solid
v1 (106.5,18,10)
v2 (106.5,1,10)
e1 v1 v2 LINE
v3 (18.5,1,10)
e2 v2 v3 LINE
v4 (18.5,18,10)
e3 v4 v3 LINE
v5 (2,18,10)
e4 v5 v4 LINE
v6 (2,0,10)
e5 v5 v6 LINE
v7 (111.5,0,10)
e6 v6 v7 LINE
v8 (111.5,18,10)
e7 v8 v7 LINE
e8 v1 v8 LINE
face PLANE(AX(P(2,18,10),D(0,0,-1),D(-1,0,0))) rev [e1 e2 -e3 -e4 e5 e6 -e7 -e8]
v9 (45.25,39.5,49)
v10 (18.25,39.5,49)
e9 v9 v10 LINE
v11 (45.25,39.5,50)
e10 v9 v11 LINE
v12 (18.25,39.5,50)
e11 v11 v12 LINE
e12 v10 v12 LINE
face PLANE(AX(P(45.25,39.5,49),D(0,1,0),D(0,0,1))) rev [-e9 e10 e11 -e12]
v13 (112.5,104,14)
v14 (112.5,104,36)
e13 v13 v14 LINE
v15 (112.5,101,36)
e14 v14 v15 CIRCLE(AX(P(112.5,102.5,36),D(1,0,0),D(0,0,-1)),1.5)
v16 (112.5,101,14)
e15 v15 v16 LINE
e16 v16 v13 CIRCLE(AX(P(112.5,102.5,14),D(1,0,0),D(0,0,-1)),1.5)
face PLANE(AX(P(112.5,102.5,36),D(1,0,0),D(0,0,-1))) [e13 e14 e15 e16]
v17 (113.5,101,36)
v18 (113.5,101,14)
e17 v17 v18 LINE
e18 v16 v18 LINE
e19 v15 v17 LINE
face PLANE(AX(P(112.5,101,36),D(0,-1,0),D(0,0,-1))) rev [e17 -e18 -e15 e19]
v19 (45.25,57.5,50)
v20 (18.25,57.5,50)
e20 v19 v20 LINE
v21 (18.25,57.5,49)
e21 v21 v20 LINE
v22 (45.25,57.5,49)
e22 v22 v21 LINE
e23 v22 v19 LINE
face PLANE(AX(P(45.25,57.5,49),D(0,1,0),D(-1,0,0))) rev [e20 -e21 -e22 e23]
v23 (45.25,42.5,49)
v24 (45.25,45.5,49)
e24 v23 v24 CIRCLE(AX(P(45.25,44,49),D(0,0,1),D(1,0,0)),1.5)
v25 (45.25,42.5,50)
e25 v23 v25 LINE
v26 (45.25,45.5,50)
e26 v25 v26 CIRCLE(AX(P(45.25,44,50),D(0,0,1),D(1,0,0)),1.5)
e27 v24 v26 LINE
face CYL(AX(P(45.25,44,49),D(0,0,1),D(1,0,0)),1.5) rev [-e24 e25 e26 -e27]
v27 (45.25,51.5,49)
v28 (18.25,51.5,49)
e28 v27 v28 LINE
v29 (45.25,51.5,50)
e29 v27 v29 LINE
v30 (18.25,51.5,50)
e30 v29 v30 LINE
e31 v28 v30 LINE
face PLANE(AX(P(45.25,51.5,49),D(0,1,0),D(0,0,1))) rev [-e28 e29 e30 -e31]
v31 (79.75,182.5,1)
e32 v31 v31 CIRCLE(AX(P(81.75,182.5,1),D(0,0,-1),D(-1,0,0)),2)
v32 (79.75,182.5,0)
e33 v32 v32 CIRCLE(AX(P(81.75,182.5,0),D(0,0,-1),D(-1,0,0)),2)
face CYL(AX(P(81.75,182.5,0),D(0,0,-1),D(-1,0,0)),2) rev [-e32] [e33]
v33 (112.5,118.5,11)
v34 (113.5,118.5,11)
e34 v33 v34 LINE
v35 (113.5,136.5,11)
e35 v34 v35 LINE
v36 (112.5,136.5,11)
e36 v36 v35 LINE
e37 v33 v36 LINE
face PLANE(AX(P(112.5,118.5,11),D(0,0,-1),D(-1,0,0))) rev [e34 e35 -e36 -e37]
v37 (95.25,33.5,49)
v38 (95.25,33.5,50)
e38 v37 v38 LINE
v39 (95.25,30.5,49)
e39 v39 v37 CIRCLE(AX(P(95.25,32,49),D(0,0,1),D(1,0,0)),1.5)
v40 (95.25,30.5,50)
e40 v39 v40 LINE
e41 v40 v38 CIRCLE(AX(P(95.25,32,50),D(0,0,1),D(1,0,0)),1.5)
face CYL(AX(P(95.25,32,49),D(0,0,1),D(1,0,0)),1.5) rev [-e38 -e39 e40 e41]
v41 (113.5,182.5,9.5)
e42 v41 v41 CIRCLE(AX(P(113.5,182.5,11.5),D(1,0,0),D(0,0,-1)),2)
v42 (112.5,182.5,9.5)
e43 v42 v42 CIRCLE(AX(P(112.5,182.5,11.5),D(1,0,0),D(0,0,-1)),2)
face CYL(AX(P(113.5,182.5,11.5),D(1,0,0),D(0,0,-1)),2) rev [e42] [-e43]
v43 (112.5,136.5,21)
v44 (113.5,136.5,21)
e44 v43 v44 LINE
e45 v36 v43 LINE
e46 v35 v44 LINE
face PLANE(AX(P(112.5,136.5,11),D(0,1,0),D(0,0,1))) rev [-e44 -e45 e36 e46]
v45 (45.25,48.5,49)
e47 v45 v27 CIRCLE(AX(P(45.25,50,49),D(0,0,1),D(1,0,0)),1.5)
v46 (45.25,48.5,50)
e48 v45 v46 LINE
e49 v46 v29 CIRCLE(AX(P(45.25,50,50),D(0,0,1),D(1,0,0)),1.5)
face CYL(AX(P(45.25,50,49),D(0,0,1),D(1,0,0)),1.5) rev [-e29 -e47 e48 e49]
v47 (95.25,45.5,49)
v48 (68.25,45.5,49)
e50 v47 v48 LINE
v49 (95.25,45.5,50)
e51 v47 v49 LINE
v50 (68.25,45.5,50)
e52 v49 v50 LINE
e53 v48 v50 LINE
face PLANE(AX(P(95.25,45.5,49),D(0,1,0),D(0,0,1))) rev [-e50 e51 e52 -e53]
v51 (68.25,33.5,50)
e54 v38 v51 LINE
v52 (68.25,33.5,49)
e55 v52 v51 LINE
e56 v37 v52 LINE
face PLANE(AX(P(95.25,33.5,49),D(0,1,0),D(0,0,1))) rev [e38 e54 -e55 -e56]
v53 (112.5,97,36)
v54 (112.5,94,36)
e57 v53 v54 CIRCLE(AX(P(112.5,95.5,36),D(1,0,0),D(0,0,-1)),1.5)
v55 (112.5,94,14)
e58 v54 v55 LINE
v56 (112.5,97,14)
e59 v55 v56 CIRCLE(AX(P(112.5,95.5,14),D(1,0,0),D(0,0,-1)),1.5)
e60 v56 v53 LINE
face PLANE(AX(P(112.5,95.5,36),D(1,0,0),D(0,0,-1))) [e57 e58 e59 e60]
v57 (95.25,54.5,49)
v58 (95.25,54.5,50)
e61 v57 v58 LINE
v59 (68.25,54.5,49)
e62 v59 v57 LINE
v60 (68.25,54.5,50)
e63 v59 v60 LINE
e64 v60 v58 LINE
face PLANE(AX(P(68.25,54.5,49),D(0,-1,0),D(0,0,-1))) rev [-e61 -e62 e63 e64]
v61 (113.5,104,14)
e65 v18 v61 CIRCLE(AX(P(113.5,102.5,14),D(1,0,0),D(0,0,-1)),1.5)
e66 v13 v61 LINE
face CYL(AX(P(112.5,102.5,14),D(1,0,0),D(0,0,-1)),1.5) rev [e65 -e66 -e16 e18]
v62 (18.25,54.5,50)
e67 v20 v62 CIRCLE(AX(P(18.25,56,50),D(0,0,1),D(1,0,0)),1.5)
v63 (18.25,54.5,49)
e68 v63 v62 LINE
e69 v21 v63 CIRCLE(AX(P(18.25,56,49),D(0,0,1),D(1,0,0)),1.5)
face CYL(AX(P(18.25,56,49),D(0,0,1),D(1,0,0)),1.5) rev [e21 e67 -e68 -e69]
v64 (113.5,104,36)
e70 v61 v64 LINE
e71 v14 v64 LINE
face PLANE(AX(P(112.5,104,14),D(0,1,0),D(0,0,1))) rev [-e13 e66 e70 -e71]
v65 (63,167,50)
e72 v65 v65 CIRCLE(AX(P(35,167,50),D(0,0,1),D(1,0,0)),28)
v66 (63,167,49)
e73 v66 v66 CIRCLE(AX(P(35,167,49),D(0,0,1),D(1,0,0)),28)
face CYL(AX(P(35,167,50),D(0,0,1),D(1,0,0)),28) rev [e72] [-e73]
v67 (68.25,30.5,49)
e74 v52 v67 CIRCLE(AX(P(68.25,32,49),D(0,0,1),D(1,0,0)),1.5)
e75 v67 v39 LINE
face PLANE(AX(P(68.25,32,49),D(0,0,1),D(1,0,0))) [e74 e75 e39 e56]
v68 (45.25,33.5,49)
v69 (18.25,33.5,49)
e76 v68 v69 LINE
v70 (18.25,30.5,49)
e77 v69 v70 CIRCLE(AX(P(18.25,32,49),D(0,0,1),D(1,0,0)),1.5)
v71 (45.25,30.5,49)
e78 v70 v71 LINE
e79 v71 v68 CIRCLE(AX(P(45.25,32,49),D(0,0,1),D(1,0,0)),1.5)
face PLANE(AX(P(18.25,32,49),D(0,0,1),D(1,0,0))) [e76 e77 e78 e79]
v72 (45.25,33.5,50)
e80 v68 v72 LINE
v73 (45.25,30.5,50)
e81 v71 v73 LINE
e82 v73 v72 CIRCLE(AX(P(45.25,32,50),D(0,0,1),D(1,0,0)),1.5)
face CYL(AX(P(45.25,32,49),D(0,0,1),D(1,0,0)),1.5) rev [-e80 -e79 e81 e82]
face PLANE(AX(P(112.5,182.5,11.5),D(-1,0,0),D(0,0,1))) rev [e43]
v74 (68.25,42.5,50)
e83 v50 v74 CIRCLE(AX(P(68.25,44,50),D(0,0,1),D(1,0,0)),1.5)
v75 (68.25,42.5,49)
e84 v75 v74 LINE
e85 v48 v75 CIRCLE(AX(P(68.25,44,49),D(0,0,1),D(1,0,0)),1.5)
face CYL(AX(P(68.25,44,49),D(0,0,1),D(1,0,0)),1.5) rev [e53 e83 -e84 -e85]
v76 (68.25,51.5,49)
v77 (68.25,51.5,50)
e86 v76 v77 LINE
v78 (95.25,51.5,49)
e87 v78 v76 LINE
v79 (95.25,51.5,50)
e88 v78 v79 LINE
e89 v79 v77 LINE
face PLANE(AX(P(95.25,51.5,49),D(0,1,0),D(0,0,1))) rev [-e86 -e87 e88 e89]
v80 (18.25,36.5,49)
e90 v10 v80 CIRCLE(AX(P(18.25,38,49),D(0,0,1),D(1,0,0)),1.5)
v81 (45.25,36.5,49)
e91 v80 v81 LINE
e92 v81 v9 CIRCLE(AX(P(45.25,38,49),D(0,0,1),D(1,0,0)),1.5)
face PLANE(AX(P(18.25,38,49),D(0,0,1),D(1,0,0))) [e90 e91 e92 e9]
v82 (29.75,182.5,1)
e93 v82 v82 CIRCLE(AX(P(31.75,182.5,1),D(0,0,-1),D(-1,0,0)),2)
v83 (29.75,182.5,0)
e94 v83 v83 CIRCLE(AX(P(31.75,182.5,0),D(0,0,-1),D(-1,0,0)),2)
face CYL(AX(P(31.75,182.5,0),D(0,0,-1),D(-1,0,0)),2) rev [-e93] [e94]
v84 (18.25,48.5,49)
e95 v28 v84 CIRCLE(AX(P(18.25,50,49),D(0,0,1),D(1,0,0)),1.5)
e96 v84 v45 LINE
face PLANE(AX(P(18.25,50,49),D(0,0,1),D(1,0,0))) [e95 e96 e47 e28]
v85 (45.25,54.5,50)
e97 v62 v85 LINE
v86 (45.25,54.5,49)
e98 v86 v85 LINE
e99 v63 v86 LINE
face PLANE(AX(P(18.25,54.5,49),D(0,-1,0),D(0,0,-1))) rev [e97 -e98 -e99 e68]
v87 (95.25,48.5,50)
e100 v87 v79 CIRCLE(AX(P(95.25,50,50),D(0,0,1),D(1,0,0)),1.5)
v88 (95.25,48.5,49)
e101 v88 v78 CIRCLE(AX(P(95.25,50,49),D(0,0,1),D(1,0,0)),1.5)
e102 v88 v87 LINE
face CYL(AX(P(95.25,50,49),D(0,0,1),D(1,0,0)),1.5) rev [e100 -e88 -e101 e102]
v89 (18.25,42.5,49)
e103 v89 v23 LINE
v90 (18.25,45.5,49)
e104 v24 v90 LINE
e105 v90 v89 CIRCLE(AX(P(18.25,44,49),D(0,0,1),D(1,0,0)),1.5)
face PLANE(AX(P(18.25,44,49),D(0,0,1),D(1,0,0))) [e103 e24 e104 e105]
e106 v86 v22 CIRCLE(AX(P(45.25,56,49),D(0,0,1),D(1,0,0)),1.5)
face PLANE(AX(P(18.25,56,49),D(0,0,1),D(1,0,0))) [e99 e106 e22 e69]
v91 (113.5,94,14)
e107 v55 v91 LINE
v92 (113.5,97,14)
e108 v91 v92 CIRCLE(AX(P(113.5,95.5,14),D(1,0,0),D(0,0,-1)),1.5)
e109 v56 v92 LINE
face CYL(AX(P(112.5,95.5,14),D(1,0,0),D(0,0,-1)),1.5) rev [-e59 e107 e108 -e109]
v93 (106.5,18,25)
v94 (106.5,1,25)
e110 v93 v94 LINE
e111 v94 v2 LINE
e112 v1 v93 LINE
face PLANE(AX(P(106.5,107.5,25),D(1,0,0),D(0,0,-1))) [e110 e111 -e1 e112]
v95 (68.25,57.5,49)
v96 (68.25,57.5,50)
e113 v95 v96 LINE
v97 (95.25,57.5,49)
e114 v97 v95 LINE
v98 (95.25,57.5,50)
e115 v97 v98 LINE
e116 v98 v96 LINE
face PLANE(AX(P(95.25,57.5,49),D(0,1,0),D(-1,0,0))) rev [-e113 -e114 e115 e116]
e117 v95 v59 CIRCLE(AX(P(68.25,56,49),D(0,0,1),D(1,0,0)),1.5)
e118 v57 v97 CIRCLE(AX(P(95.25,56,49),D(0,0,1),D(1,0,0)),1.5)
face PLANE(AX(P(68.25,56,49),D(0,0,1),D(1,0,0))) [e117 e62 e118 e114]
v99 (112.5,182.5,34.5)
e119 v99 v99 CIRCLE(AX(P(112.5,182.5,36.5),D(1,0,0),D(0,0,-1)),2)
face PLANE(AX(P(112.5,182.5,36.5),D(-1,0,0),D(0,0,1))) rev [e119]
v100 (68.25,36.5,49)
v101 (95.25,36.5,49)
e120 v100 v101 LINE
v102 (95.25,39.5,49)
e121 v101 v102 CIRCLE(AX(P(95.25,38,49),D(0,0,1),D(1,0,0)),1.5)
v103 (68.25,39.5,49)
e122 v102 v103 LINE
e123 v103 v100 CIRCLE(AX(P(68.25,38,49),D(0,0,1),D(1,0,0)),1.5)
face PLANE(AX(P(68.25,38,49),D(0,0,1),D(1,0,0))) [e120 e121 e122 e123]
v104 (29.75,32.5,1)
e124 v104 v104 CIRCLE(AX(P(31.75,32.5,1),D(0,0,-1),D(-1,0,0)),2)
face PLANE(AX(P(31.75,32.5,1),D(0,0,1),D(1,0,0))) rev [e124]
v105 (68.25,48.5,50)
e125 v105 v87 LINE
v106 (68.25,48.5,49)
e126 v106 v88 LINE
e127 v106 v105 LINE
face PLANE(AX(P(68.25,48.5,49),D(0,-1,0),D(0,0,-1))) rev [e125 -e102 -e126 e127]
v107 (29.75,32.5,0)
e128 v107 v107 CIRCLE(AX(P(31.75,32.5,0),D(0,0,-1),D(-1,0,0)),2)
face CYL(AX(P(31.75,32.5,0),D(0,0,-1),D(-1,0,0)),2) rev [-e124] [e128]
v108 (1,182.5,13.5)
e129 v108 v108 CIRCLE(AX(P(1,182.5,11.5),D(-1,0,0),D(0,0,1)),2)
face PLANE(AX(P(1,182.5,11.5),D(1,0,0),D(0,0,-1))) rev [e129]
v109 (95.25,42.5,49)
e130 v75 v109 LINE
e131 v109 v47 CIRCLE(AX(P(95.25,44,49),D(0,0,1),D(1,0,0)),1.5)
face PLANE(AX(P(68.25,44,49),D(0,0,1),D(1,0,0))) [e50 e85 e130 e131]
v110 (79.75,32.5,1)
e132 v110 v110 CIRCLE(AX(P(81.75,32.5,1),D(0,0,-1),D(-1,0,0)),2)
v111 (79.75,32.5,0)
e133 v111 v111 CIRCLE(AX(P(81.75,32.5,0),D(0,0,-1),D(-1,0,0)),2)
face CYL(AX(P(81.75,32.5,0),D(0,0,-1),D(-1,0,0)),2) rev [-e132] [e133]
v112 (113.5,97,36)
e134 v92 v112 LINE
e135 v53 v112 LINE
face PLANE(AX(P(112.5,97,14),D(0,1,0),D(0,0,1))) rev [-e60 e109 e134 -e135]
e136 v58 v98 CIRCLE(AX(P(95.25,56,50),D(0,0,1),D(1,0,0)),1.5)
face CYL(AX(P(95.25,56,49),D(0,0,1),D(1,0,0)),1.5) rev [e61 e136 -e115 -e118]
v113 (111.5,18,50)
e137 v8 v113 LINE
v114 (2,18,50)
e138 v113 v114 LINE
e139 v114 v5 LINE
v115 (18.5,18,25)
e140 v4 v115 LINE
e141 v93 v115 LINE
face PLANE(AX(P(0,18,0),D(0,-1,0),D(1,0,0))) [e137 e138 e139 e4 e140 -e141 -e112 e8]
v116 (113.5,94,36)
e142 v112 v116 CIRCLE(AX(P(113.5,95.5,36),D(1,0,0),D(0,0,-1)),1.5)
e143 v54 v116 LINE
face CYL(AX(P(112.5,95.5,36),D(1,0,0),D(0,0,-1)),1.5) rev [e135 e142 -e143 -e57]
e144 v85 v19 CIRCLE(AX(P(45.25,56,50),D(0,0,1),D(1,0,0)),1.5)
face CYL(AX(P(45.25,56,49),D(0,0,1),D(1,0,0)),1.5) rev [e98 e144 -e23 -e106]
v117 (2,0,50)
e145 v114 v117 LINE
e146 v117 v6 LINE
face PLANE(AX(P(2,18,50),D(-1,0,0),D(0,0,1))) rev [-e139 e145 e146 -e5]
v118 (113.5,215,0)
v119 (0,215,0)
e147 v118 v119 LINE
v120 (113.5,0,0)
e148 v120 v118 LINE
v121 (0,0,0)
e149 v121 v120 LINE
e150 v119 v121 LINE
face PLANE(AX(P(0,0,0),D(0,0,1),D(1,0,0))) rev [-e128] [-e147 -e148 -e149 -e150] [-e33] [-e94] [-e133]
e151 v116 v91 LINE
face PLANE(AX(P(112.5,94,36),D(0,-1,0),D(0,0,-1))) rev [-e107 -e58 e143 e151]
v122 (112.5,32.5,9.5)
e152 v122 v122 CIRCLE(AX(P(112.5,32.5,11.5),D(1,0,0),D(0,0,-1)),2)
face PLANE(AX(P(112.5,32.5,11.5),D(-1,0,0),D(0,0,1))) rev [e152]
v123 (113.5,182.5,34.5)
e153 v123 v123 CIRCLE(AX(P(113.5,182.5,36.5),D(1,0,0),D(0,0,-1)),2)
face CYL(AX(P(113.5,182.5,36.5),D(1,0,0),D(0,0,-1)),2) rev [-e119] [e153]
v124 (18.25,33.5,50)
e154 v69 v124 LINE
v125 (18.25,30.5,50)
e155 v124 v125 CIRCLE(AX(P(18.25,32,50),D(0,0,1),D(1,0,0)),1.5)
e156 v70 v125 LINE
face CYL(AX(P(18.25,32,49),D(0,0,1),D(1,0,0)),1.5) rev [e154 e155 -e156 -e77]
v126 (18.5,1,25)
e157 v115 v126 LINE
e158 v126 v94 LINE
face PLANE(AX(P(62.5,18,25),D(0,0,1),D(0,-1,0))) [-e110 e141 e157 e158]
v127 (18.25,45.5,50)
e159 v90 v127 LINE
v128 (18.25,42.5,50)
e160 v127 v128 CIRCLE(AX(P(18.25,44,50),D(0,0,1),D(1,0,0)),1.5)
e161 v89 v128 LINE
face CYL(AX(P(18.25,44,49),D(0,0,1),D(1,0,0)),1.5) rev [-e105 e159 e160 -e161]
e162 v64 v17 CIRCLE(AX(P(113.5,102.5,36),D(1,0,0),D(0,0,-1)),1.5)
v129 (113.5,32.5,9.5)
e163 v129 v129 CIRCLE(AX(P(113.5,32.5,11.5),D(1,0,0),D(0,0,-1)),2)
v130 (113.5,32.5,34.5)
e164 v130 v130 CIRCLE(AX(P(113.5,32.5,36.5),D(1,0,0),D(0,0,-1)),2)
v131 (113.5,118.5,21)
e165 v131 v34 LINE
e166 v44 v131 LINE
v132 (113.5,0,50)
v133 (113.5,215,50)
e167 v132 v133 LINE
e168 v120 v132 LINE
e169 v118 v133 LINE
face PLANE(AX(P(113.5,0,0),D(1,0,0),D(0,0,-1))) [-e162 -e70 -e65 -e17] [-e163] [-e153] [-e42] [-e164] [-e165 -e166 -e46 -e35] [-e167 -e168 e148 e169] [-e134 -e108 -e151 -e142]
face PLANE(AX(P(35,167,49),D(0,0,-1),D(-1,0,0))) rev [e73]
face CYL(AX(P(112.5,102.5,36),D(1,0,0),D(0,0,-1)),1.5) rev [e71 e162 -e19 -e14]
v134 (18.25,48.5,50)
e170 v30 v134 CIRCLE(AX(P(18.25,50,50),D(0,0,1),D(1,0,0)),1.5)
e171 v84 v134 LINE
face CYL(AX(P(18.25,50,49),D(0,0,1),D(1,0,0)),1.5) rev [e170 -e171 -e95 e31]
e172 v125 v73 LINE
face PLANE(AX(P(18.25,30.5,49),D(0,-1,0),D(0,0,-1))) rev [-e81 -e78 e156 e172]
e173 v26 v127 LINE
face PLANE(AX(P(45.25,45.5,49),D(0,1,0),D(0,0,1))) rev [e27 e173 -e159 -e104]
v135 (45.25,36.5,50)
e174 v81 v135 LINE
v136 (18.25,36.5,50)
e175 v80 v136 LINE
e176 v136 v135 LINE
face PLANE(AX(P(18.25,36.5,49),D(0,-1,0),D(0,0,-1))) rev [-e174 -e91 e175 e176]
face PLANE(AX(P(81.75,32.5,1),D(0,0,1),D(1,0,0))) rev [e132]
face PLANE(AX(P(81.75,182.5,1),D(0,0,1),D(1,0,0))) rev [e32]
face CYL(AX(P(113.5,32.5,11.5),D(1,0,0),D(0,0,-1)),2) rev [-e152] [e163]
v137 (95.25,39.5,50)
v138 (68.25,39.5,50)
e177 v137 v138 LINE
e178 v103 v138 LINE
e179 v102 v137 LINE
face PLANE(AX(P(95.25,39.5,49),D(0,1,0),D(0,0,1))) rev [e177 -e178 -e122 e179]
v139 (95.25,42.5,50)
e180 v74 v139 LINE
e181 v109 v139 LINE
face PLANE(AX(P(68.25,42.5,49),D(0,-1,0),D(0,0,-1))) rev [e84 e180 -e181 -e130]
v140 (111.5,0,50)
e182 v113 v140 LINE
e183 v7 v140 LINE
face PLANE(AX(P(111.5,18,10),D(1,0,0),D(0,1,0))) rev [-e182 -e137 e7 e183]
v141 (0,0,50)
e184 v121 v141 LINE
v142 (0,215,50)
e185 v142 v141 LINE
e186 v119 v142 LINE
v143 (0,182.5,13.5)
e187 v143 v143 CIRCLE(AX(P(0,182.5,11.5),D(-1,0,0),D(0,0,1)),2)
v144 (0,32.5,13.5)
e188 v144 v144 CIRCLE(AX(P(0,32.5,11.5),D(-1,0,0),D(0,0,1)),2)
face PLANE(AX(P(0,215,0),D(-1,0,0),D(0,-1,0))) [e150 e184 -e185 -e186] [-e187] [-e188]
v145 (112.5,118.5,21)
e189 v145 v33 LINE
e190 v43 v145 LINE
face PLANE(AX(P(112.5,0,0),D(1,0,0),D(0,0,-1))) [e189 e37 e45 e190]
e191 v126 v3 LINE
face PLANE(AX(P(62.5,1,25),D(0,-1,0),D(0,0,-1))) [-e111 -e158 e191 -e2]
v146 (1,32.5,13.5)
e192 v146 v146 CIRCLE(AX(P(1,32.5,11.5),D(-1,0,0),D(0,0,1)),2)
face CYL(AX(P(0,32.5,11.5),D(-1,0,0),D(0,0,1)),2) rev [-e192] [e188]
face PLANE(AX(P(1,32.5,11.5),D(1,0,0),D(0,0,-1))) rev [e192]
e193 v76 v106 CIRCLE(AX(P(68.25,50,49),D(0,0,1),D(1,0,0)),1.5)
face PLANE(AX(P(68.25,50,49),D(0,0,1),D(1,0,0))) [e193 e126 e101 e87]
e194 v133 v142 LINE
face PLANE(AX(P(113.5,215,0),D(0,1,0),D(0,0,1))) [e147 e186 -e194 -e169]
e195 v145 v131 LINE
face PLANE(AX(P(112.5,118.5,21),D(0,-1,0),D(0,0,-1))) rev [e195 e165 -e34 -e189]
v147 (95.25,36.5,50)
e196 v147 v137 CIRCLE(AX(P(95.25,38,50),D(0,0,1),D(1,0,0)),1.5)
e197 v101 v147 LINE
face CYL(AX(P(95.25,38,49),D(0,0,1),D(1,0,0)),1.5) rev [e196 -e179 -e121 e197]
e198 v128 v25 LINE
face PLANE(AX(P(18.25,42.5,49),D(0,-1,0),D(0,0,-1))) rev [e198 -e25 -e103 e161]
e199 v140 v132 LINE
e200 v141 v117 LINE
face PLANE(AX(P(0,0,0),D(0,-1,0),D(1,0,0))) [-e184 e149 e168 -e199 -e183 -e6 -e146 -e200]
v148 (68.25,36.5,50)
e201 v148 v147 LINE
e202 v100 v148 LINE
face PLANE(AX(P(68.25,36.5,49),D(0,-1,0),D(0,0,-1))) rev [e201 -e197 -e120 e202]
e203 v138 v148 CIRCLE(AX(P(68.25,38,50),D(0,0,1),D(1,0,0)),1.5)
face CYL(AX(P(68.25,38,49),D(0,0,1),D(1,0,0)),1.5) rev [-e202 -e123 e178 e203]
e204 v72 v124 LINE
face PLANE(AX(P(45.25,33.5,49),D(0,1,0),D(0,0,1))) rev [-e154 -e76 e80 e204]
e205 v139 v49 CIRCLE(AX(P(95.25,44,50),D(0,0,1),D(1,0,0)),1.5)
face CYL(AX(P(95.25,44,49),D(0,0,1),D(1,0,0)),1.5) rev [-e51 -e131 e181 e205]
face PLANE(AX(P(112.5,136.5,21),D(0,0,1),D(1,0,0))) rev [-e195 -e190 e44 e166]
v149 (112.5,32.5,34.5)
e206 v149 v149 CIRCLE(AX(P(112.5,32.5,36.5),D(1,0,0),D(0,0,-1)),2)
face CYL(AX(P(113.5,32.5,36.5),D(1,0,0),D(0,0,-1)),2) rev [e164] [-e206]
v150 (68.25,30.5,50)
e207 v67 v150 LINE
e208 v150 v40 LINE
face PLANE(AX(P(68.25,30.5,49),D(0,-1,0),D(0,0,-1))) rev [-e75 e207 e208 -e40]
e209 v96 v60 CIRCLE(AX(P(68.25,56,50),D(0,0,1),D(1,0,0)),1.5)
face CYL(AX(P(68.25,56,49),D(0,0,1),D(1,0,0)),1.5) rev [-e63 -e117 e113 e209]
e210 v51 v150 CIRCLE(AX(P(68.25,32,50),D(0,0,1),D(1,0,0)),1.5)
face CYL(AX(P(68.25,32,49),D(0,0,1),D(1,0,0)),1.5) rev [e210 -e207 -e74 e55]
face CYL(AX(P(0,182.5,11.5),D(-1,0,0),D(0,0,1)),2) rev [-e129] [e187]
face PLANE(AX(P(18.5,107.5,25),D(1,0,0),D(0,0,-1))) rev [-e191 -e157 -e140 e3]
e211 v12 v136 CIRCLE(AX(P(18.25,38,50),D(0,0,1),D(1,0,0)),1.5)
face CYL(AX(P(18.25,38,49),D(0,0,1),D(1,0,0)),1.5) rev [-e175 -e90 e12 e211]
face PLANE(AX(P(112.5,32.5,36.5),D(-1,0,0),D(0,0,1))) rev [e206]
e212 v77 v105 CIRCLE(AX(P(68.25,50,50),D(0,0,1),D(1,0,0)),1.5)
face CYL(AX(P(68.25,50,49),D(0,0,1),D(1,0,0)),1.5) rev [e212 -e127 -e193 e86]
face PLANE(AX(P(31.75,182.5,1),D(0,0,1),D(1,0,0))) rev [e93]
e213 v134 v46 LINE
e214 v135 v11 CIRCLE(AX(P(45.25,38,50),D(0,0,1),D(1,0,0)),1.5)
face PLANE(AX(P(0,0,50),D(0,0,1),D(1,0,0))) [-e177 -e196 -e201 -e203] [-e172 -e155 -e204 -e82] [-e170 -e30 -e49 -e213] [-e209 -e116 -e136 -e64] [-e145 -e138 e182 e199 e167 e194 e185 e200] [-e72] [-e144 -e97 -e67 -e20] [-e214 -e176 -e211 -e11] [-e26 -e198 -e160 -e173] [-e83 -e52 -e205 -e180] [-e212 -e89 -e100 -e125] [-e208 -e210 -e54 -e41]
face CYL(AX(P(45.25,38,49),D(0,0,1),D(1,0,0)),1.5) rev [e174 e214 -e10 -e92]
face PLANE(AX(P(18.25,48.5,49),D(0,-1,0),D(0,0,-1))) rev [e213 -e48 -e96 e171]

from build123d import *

# Parameters (mm, degrees)
SKETCH1_W                    = 113.5
SKETCH1_H                    = 215
BOSS_EXTRUDE1_DEPTH          = 50
CUT_EXTRUDE1_DEPTH           = 1
CUT_EXTRUDE2_DEPTH           = 1
CUT_EXTRUDE3_DEPTH           = 1
CUT_EXTRUDE4_DEPTH           = 1
CUT_EXTRUDE5_DEPTH           = 1
CUT_EXTRUDE6_DEPTH           = 1
CUT_EXTRUDE7_DEPTH           = 1
CUT_EXTRUDE8_DEPTH           = 1
CUT_EXTRUDE9_DEPTH           = 1
SKETCH11_W                   = 109.5
SKETCH11_H                   = 40
CUT_EXTRUDE10_DEPTH          = 18
CUT_EXTRUDE11_DEPTH          = 1
CUT_EXTRUDE12_DEPTH          = 1
SKETCH14_W                   = 10
SKETCH14_H                   = 18
CUT_EXTRUDE13_DEPTH          = 1
CUT_EXTRUDE14_DEPTH          = 1
F_4_0_4_DIAMETER_HOLE1_D     = 4
F_4_0_4_DIAMETER_HOLE1_DEPTH = 1
F_4_0_4_DIAMETER_HOLE2_D     = 4
F_4_0_4_DIAMETER_HOLE2_DEPTH = 1
F_4_0_4_DIAMETER_HOLE3_D     = 4
F_4_0_4_DIAMETER_HOLE3_DEPTH = 1
M48_CLEARANCE_HOLE1_D        = 56
M48_CLEARANCE_HOLE1_DEPTH    = 1
RIB1_START                   = -44
RIB1_OUTLINE_W               = 15
RIB1_OUTLINE_H               = 17
RIB1_DEPTH                   = 88


# Read off the part's stored shape, not the designer's step: Rib1
with BuildPart() as part:
    # Sketch1 → Boss-Extrude1 (new body)
    with BuildSketch(Plane.XY.offset(50)):
        with Locations((56.75, 107.5)):
            Rectangle(SKETCH1_W, SKETCH1_H)
    extrude(amount=-BOSS_EXTRUDE1_DEPTH)

    # Sketch2 → Cut-Extrude1 (cut)
    with BuildSketch(Plane.XY.offset(50)):
        with BuildLine():
            Line((18.25, 36.5), (45.25, 36.5))
            ThreePointArc((45.25, 36.5), (46.75, 38), (45.25, 39.5))
            Line((45.25, 39.5), (18.25, 39.5))
            ThreePointArc((18.25, 39.5), (16.75, 38), (18.25, 36.5))
        make_face()
    extrude(amount=-CUT_EXTRUDE1_DEPTH, mode=Mode.SUBTRACT)

    # Sketch3 → Cut-Extrude2 (cut)
    with BuildSketch(Plane.XY.offset(50)):
        with BuildLine():
            Line((18.25, 30.5), (45.25, 30.5))
            ThreePointArc((45.25, 30.5), (46.75, 32), (45.25, 33.5))
            Line((45.25, 33.5), (18.25, 33.5))
            ThreePointArc((18.25, 33.5), (16.75, 32), (18.25, 30.5))
        make_face()
    extrude(amount=-CUT_EXTRUDE2_DEPTH, mode=Mode.SUBTRACT)

    # Sketch4 → Cut-Extrude3 (cut)
    with BuildSketch(Plane.XY.offset(50)):
        with BuildLine():
            Line((18.25, 48.5), (45.25, 48.5))
            ThreePointArc((45.25, 48.5), (46.75, 50), (45.25, 51.5))
            Line((45.25, 51.5), (18.25, 51.5))
            ThreePointArc((18.25, 51.5), (16.75, 50), (18.25, 48.5))
        make_face()
    extrude(amount=-CUT_EXTRUDE3_DEPTH, mode=Mode.SUBTRACT)

    # Sketch5 → Cut-Extrude4 (cut)
    with BuildSketch(Plane.XY.offset(50)):
        with BuildLine():
            Line((18.25, 42.5), (45.25, 42.5))
            ThreePointArc((45.25, 42.5), (46.75, 44), (45.25, 45.5))
            Line((45.25, 45.5), (18.25, 45.5))
            ThreePointArc((18.25, 45.5), (16.75, 44), (18.25, 42.5))
        make_face()
    extrude(amount=-CUT_EXTRUDE4_DEPTH, mode=Mode.SUBTRACT)

    # Sketch6 → Cut-Extrude5 (cut)
    with BuildSketch(Plane.XY.offset(50)):
        with BuildLine():
            Line((68.25, 54.5), (95.25, 54.5))
            ThreePointArc((95.25, 54.5), (96.75, 56), (95.25, 57.5))
            Line((95.25, 57.5), (68.25, 57.5))
            ThreePointArc((68.25, 57.5), (66.75, 56), (68.25, 54.5))
        make_face()
    extrude(amount=-CUT_EXTRUDE5_DEPTH, mode=Mode.SUBTRACT)

    # Sketch7 → Cut-Extrude6 (cut)
    with BuildSketch(Plane.XY.offset(50)):
        with BuildLine():
            Line((18.25, 54.5), (45.25, 54.5))
            ThreePointArc((45.25, 54.5), (46.75, 56), (45.25, 57.5))
            Line((45.25, 57.5), (18.25, 57.5))
            ThreePointArc((18.25, 57.5), (16.75, 56), (18.25, 54.5))
        make_face()
    extrude(amount=-CUT_EXTRUDE6_DEPTH, mode=Mode.SUBTRACT)

    # Sketch8 → Cut-Extrude7 (cut)
    with BuildSketch(Plane.XY.offset(50)):
        with BuildLine():
            Line((68.25, 48.5), (95.25, 48.5))
            ThreePointArc((95.25, 48.5), (96.75, 50), (95.25, 51.5))
            Line((95.25, 51.5), (68.25, 51.5))
            ThreePointArc((68.25, 51.5), (66.75, 50), (68.25, 48.5))
        make_face()
    extrude(amount=-CUT_EXTRUDE7_DEPTH, mode=Mode.SUBTRACT)

    # Sketch9 → Cut-Extrude8 (cut)
    with BuildSketch(Plane.XY.offset(50)):
        with BuildLine():
            Line((68.25, 42.5), (95.25, 42.5))
            ThreePointArc((95.25, 42.5), (96.75, 44), (95.25, 45.5))
            Line((95.25, 45.5), (68.25, 45.5))
            ThreePointArc((68.25, 45.5), (66.75, 44), (68.25, 42.5))
        make_face()
    extrude(amount=-CUT_EXTRUDE8_DEPTH, mode=Mode.SUBTRACT)

    # Sketch10 → Cut-Extrude9 (cut)
    with BuildSketch(Plane.XY.offset(50)):
        with BuildLine():
            Line((68.25, 36.5), (95.25, 36.5))
            ThreePointArc((95.25, 36.5), (96.75, 38), (95.25, 39.5))
            Line((95.25, 39.5), (68.25, 39.5))
            ThreePointArc((68.25, 39.5), (66.75, 38), (68.25, 36.5))
        make_face()
    extrude(amount=-CUT_EXTRUDE9_DEPTH, mode=Mode.SUBTRACT)

    # Sketch11 → Cut-Extrude10 (cut)
    with BuildSketch(Plane.XZ):
        with Locations((56.75, 30)):
            Rectangle(SKETCH11_W, SKETCH11_H)
    extrude(amount=-CUT_EXTRUDE10_DEPTH, mode=Mode.SUBTRACT)

    # Sketch12 → Cut-Extrude11 (cut)
    with BuildSketch(Plane.XY.offset(50)):
        with BuildLine():
            Line((68.25, 30.5), (95.25, 30.5))
            ThreePointArc((95.25, 30.5), (96.75, 32), (95.25, 33.5))
            Line((95.25, 33.5), (68.25, 33.5))
            ThreePointArc((68.25, 33.5), (66.75, 32), (68.25, 30.5))
        make_face()
    extrude(amount=-CUT_EXTRUDE11_DEPTH, mode=Mode.SUBTRACT)

    # Sketch13 → Cut-Extrude12 (cut)
    with BuildSketch(Plane(origin=(113.5, 0, 0), x_dir=(0, 0, -1), z_dir=(1, 0, 0))):
        with BuildLine():
            Line((-36, 101), (-14, 101))
            ThreePointArc((-14, 101), (-12.5, 102.5), (-14, 104))
            Line((-14, 104), (-36, 104))
            ThreePointArc((-36, 104), (-37.5, 102.5), (-36, 101))
        make_face()
    extrude(amount=-CUT_EXTRUDE12_DEPTH, mode=Mode.SUBTRACT)

    # Sketch14 → Cut-Extrude13 (cut)
    with BuildSketch(Plane(origin=(113.5, 0, 0), x_dir=(0, 0, -1), z_dir=(1, 0, 0))):
        with Locations((-16, 127.5)):
            Rectangle(SKETCH14_W, SKETCH14_H)
    extrude(amount=-CUT_EXTRUDE13_DEPTH, mode=Mode.SUBTRACT)

    # Sketch15 → Cut-Extrude14 (cut)
    with BuildSketch(Plane(origin=(113.5, 0, 0), x_dir=(0, 0, -1), z_dir=(1, 0, 0))):
        with BuildLine():
            Line((-36, 94), (-14, 94))
            ThreePointArc((-14, 94), (-12.5, 95.5), (-14, 97))
            Line((-14, 97), (-36, 97))
            ThreePointArc((-36, 97), (-37.5, 95.5), (-36, 94))
        make_face()
    extrude(amount=-CUT_EXTRUDE14_DEPTH, mode=Mode.SUBTRACT)

    # Ø4.0 (4) Diameter Hole1
    with Locations(Plane(origin=(0, 0, 0), x_dir=(-1, 0, 0), z_dir=(0, 0, -1))):
        with Locations((-31.75, 182.5), (-81.75, 182.5), (-31.75, 32.5), (-81.75, 32.5)):
            Hole(F_4_0_4_DIAMETER_HOLE1_D / 2, depth=F_4_0_4_DIAMETER_HOLE1_DEPTH)

    # Ø4.0 (4) Diameter Hole2
    with Locations(Plane.ZY):
        with Locations((11.5, 32.5), (11.5, 182.5)):
            Hole(F_4_0_4_DIAMETER_HOLE2_D / 2, depth=F_4_0_4_DIAMETER_HOLE2_DEPTH)

    # Ø4.0 (4) Diameter Hole3
    with Locations(Plane(origin=(113.5, 0, 0), x_dir=(0, 0, -1), z_dir=(1, 0, 0))):
        with Locations((-36.5, 32.5), (-11.5, 32.5), (-36.5, 182.5), (-11.5, 182.5)):
            Hole(F_4_0_4_DIAMETER_HOLE3_D / 2, depth=F_4_0_4_DIAMETER_HOLE3_DEPTH)

    # M48 Clearance Hole1
    with Locations(Plane.XY.offset(50)):
        with Locations((35, 167)):
            Hole(M48_CLEARANCE_HOLE1_D / 2, depth=M48_CLEARANCE_HOLE1_DEPTH)

    # Rib1 outline → Rib1 (add)
    with BuildSketch(Plane(origin=(62.5, 0, 0), x_dir=(0, 0, -1), z_dir=(1, 0, 0)).offset(RIB1_START)):
        with Locations((-17.5, 9.5)):
            Rectangle(RIB1_OUTLINE_W, RIB1_OUTLINE_H)
    extrude(amount=RIB1_DEPTH)


solid = part.part
